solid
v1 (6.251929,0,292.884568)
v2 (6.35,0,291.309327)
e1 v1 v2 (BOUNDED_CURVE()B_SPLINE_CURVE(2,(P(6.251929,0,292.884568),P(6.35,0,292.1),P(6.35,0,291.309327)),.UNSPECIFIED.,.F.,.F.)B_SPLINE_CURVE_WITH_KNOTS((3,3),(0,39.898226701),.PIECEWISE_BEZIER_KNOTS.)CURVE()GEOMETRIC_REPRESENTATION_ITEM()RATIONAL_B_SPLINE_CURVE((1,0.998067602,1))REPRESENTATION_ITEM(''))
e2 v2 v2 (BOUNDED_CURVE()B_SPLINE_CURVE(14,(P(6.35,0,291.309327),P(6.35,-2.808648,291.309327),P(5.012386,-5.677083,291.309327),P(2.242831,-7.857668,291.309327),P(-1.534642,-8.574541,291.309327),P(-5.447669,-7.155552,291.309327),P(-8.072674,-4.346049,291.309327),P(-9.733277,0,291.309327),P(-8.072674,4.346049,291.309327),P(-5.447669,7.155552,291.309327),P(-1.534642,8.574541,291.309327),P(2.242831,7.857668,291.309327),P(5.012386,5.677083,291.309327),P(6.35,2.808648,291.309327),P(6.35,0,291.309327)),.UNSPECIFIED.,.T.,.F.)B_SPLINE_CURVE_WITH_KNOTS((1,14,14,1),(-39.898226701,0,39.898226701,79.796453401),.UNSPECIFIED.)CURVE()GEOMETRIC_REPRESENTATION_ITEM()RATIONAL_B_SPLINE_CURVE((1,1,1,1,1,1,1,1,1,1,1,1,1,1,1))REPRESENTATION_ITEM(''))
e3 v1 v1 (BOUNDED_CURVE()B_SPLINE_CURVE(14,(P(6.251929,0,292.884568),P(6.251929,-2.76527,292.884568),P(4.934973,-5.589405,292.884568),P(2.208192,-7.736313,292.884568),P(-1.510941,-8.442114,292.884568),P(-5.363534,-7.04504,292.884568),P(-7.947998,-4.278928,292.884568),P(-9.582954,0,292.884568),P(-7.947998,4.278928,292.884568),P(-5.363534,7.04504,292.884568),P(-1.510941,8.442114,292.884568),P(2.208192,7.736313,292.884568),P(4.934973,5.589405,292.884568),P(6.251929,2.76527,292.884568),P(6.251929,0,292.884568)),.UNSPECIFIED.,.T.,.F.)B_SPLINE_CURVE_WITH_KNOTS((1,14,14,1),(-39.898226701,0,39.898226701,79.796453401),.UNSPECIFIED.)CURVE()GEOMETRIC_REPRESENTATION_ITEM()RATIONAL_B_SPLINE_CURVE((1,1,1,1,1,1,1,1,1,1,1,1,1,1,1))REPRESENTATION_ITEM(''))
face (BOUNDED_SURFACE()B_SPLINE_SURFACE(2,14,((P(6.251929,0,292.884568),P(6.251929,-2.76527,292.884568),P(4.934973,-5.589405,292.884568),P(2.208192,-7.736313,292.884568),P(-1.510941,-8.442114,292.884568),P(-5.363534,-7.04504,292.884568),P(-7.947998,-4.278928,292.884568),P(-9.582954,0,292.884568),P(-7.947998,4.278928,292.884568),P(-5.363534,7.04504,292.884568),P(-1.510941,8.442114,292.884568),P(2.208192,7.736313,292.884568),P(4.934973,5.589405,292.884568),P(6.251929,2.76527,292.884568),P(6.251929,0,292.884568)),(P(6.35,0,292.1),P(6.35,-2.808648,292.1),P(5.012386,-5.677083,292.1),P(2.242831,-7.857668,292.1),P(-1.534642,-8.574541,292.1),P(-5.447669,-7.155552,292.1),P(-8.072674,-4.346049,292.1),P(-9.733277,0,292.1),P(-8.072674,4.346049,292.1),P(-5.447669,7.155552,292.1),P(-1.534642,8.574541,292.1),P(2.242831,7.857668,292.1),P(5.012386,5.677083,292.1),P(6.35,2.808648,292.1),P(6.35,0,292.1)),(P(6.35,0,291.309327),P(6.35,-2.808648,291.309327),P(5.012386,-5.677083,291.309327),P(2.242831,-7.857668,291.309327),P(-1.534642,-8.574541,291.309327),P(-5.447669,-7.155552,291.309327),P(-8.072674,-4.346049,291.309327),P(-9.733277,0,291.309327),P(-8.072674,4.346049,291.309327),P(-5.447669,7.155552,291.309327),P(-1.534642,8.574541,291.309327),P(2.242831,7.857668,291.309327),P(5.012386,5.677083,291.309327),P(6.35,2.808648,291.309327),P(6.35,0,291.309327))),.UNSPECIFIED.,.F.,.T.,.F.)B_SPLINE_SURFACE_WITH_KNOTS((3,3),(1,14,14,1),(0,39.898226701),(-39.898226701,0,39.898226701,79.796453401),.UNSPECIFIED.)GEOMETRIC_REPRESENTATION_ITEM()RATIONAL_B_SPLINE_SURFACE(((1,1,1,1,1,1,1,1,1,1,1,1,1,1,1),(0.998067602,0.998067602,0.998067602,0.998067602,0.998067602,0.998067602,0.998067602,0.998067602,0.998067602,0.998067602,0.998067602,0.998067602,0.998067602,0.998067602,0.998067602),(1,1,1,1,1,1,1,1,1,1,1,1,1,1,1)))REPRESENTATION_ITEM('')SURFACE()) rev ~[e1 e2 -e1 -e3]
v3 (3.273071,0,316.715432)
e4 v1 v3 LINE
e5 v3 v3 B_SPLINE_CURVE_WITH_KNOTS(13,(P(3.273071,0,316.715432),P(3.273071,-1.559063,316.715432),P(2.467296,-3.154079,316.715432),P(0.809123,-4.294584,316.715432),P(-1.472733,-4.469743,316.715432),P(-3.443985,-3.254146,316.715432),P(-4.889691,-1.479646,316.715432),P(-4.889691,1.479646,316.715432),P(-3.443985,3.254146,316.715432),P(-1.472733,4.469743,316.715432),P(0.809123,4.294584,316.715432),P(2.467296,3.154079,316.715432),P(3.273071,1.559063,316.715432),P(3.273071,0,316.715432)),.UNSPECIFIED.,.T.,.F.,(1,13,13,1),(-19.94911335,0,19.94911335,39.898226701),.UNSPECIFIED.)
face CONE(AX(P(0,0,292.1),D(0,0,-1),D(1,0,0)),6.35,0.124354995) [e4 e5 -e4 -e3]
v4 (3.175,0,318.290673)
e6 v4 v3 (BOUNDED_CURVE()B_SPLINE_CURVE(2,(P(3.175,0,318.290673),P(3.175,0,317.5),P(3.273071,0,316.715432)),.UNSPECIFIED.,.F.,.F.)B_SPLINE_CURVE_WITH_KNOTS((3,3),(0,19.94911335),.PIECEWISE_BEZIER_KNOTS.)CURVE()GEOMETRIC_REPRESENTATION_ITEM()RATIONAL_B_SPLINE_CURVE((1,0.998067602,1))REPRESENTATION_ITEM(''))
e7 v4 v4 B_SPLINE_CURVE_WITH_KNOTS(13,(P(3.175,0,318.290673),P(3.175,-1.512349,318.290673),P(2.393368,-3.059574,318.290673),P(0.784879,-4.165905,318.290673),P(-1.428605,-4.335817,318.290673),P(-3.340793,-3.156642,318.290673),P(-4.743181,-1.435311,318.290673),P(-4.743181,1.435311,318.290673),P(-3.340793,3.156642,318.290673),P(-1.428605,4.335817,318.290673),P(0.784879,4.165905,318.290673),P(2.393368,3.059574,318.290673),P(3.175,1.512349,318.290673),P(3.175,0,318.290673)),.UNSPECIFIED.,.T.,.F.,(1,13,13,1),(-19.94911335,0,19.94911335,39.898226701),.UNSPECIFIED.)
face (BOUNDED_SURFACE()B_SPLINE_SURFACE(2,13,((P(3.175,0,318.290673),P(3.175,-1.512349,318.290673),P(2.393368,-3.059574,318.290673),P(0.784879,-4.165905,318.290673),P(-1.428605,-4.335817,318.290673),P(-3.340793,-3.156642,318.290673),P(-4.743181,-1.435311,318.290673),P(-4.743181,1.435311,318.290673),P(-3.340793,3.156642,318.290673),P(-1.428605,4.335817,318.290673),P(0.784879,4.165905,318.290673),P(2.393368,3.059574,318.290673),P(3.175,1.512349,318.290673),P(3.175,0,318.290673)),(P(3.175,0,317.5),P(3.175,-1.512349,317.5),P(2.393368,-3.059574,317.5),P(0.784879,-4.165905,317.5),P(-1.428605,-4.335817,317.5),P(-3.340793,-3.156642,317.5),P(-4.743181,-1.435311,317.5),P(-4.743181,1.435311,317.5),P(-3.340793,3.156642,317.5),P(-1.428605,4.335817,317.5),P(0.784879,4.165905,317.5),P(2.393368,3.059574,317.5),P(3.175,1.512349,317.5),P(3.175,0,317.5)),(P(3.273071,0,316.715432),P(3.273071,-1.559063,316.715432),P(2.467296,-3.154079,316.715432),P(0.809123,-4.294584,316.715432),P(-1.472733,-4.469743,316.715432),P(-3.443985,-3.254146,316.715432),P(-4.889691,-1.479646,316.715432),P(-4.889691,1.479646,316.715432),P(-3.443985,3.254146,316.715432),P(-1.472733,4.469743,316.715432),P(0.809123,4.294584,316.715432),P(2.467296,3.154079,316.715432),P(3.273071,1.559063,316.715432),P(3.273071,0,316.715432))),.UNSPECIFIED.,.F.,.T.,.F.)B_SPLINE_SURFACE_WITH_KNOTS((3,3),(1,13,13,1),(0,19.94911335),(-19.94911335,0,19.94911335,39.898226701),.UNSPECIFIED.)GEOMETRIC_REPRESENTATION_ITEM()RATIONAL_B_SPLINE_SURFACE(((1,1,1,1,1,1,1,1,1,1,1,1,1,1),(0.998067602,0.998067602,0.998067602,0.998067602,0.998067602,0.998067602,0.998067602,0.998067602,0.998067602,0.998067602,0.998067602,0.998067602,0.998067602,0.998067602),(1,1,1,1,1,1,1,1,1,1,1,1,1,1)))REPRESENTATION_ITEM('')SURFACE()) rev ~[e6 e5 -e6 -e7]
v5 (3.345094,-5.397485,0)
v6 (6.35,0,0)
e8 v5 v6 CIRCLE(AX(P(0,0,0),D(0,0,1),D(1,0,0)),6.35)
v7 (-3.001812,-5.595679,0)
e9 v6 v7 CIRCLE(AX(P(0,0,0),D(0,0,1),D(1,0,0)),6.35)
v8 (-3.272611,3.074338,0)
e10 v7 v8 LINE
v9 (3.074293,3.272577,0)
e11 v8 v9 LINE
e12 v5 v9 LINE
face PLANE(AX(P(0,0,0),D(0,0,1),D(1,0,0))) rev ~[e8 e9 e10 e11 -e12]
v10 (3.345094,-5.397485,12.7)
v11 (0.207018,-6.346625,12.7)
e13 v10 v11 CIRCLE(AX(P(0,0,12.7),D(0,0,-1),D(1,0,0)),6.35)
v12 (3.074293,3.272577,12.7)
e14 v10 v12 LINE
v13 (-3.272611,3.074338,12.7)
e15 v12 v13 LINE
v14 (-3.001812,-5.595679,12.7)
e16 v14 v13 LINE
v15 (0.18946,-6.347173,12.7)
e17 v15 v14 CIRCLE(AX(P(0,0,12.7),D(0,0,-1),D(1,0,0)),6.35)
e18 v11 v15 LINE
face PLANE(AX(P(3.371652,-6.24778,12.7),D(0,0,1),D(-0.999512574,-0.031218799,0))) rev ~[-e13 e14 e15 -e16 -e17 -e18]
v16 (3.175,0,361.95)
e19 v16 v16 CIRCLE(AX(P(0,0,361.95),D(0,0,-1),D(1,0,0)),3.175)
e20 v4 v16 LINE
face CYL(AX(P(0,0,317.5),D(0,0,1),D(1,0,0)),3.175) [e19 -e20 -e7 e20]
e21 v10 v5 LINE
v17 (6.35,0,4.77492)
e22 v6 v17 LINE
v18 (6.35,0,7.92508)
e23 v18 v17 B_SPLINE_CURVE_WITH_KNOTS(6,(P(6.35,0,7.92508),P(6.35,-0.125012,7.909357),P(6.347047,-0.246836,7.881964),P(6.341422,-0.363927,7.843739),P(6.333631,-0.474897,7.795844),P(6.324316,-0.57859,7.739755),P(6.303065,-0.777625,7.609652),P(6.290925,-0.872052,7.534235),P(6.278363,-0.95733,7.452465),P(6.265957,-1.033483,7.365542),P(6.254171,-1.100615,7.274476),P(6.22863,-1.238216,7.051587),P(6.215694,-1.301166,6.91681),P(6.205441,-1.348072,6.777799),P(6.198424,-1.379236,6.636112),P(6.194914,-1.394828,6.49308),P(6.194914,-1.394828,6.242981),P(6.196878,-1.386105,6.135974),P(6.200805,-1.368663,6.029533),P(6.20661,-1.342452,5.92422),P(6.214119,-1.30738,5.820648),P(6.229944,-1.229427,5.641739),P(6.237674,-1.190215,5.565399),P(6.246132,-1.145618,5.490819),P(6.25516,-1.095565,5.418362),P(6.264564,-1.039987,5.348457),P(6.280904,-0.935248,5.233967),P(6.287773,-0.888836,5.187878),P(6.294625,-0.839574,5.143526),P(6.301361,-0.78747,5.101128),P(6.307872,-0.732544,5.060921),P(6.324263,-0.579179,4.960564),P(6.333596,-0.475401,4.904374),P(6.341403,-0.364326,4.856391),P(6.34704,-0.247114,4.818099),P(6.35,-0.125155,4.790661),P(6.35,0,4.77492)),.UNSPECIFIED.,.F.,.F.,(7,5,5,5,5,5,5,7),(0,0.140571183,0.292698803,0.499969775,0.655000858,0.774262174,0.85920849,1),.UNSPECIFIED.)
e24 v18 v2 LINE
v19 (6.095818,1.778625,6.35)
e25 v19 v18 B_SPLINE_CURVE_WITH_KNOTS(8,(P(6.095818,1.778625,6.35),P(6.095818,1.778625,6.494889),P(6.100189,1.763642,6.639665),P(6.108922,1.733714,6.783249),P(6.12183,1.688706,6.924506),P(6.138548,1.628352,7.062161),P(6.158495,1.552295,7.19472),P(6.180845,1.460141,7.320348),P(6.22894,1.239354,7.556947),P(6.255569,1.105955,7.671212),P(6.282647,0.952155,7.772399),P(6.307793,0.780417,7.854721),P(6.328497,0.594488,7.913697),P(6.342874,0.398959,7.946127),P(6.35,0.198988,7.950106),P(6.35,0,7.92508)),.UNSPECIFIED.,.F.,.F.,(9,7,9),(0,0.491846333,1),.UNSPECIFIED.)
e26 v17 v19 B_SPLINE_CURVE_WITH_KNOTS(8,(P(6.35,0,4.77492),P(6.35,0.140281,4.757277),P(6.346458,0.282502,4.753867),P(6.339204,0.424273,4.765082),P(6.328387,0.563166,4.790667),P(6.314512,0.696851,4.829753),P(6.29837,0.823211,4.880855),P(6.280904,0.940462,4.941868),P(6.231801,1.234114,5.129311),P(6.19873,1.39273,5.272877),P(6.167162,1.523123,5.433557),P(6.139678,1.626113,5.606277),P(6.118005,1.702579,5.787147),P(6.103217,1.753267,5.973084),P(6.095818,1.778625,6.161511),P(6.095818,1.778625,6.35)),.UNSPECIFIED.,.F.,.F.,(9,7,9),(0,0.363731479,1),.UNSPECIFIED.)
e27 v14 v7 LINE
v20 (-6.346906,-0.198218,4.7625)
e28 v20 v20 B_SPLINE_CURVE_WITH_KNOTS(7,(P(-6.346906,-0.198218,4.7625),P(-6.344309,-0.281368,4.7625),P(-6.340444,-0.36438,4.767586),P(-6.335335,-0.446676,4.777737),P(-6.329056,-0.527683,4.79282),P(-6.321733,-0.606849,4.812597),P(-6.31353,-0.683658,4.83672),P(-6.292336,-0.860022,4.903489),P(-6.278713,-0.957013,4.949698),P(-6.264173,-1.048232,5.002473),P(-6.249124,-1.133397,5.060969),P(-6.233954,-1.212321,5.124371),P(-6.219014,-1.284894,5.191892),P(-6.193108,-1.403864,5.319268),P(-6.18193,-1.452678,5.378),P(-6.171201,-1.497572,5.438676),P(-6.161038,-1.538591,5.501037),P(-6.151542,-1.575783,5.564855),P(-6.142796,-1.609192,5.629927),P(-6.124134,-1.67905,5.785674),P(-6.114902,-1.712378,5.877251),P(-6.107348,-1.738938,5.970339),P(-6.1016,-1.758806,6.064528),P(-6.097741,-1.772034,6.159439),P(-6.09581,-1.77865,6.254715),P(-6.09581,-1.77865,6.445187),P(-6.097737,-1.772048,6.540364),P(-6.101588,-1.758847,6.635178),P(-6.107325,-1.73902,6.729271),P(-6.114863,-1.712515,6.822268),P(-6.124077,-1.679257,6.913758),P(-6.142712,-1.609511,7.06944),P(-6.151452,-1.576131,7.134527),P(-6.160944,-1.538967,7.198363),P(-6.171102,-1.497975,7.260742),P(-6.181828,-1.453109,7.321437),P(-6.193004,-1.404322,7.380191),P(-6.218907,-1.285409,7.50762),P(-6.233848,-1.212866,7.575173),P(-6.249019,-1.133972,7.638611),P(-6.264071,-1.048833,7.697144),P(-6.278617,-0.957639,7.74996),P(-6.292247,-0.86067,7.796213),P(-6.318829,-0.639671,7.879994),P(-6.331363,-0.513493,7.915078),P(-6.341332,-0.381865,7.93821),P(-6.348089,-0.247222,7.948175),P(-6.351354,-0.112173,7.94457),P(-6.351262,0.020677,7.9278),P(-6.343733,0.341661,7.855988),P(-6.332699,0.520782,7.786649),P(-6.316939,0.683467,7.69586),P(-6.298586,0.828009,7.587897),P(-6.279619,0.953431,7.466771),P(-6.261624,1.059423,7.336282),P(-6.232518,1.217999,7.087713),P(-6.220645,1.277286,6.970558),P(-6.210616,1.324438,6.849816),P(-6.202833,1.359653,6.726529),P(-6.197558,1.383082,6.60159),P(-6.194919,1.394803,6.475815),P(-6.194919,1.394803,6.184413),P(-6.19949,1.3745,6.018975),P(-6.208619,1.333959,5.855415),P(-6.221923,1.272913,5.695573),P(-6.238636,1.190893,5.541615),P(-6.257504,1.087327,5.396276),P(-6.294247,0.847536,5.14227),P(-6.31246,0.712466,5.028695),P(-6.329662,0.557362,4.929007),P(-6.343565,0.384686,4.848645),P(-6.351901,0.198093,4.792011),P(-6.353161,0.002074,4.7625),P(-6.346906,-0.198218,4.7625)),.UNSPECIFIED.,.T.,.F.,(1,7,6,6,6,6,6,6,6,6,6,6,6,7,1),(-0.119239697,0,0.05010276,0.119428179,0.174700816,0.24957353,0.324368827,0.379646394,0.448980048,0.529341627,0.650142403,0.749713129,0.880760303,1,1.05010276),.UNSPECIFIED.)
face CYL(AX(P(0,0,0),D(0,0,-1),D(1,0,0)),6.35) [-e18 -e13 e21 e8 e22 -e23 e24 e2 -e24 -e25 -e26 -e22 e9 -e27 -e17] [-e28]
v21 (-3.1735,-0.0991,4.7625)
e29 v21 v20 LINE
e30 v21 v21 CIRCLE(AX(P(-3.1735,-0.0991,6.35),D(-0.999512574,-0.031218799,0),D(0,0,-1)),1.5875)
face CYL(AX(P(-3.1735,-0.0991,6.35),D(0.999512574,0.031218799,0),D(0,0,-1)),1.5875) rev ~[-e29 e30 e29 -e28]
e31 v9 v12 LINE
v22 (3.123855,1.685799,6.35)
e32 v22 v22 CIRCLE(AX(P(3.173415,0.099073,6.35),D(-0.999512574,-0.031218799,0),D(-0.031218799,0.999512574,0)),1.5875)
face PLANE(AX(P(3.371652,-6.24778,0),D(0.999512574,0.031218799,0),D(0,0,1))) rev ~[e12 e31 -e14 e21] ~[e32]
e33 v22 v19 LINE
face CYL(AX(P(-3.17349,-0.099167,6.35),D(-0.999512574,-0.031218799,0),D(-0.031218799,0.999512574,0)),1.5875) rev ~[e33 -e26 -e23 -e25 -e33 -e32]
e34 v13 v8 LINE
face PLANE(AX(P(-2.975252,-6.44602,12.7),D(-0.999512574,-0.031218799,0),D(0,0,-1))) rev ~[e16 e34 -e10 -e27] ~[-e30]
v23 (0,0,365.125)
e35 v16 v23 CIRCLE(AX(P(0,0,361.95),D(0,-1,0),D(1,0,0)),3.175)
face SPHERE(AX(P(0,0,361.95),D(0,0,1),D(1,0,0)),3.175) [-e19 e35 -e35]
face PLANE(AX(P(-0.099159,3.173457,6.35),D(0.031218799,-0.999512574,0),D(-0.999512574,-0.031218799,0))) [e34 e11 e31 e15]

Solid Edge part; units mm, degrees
sketch "Sketch1" plane through (0, 0, 0) normal (0, 0, 1) x (1, 0, 0)
  circle A0 centre (0, 0) radius 6.35
extrude "Protrusion1" add sketch "Sketch1" along normal blind 365.125
sketch "Sketch2" plane through (0, 0, 0) normal (0, -1, 0) x (1, 0, 0)
  line L0 (6.35, 365.125) -> (6.35, 292.1)
  line L1 (6.35, 292.1) -> (3.175, 317.5)
  line L2 (3.175, 317.5) -> (3.175, 365.125)
  line L3 (3.175, 365.125) -> (6.35, 365.125)
revolve "RevolvedCutout1" cut sketch "Sketch2" angle 360 about axis through (0, 0, 365.125) along (0, 0, -1)
fillet "Round_1" radius 3.175 1 edges at (-3.175, 0, 365.125)
fillet "Round_3" radius 12.7 2 edges at (-3.175, 0, 317.5) (-6.35, 0, 292.1)
sketch "Sketch3" plane through (0.1982, -6.3469, 145.6547) normal (0.0312188, -0.9995126, 0) x (0, 0, -1)
  line L0 (145.6547, 3.175) -> (132.9547, 3.175)
  line L1 (132.9547, 3.175) -> (132.9547, -3.175)
  line L2 (132.9547, -3.175) -> (145.6547, -3.175)
  line L3 (145.6547, -3.175) -> (145.6547, 3.175)
  dimension "D1" = 3.175
  dimension "D2" = 3.175
  dimension "D3" = 12.7
extrude "ExtrudedCutout_1" cut sketch "Sketch3" against normal blind 9.525
hole "Hole_1" at (-3.1735, -0.0991, 6.35) direction (-0.9995126, -0.0312188, 0) diameter 3.175 end up to next
sketch "Sketch4" plane through (-3.1372, -1.2607, 6.35) normal (0.9995126, 0.0312188, 0) x (-0.0312188, 0.9995126, 0)
  circle A0 centre (1.1621, 0) radius 1.5875
extrude "Cutout1" cut sketch "Sketch4" along normal through all
properties material "ABS Plastic, high impact"
